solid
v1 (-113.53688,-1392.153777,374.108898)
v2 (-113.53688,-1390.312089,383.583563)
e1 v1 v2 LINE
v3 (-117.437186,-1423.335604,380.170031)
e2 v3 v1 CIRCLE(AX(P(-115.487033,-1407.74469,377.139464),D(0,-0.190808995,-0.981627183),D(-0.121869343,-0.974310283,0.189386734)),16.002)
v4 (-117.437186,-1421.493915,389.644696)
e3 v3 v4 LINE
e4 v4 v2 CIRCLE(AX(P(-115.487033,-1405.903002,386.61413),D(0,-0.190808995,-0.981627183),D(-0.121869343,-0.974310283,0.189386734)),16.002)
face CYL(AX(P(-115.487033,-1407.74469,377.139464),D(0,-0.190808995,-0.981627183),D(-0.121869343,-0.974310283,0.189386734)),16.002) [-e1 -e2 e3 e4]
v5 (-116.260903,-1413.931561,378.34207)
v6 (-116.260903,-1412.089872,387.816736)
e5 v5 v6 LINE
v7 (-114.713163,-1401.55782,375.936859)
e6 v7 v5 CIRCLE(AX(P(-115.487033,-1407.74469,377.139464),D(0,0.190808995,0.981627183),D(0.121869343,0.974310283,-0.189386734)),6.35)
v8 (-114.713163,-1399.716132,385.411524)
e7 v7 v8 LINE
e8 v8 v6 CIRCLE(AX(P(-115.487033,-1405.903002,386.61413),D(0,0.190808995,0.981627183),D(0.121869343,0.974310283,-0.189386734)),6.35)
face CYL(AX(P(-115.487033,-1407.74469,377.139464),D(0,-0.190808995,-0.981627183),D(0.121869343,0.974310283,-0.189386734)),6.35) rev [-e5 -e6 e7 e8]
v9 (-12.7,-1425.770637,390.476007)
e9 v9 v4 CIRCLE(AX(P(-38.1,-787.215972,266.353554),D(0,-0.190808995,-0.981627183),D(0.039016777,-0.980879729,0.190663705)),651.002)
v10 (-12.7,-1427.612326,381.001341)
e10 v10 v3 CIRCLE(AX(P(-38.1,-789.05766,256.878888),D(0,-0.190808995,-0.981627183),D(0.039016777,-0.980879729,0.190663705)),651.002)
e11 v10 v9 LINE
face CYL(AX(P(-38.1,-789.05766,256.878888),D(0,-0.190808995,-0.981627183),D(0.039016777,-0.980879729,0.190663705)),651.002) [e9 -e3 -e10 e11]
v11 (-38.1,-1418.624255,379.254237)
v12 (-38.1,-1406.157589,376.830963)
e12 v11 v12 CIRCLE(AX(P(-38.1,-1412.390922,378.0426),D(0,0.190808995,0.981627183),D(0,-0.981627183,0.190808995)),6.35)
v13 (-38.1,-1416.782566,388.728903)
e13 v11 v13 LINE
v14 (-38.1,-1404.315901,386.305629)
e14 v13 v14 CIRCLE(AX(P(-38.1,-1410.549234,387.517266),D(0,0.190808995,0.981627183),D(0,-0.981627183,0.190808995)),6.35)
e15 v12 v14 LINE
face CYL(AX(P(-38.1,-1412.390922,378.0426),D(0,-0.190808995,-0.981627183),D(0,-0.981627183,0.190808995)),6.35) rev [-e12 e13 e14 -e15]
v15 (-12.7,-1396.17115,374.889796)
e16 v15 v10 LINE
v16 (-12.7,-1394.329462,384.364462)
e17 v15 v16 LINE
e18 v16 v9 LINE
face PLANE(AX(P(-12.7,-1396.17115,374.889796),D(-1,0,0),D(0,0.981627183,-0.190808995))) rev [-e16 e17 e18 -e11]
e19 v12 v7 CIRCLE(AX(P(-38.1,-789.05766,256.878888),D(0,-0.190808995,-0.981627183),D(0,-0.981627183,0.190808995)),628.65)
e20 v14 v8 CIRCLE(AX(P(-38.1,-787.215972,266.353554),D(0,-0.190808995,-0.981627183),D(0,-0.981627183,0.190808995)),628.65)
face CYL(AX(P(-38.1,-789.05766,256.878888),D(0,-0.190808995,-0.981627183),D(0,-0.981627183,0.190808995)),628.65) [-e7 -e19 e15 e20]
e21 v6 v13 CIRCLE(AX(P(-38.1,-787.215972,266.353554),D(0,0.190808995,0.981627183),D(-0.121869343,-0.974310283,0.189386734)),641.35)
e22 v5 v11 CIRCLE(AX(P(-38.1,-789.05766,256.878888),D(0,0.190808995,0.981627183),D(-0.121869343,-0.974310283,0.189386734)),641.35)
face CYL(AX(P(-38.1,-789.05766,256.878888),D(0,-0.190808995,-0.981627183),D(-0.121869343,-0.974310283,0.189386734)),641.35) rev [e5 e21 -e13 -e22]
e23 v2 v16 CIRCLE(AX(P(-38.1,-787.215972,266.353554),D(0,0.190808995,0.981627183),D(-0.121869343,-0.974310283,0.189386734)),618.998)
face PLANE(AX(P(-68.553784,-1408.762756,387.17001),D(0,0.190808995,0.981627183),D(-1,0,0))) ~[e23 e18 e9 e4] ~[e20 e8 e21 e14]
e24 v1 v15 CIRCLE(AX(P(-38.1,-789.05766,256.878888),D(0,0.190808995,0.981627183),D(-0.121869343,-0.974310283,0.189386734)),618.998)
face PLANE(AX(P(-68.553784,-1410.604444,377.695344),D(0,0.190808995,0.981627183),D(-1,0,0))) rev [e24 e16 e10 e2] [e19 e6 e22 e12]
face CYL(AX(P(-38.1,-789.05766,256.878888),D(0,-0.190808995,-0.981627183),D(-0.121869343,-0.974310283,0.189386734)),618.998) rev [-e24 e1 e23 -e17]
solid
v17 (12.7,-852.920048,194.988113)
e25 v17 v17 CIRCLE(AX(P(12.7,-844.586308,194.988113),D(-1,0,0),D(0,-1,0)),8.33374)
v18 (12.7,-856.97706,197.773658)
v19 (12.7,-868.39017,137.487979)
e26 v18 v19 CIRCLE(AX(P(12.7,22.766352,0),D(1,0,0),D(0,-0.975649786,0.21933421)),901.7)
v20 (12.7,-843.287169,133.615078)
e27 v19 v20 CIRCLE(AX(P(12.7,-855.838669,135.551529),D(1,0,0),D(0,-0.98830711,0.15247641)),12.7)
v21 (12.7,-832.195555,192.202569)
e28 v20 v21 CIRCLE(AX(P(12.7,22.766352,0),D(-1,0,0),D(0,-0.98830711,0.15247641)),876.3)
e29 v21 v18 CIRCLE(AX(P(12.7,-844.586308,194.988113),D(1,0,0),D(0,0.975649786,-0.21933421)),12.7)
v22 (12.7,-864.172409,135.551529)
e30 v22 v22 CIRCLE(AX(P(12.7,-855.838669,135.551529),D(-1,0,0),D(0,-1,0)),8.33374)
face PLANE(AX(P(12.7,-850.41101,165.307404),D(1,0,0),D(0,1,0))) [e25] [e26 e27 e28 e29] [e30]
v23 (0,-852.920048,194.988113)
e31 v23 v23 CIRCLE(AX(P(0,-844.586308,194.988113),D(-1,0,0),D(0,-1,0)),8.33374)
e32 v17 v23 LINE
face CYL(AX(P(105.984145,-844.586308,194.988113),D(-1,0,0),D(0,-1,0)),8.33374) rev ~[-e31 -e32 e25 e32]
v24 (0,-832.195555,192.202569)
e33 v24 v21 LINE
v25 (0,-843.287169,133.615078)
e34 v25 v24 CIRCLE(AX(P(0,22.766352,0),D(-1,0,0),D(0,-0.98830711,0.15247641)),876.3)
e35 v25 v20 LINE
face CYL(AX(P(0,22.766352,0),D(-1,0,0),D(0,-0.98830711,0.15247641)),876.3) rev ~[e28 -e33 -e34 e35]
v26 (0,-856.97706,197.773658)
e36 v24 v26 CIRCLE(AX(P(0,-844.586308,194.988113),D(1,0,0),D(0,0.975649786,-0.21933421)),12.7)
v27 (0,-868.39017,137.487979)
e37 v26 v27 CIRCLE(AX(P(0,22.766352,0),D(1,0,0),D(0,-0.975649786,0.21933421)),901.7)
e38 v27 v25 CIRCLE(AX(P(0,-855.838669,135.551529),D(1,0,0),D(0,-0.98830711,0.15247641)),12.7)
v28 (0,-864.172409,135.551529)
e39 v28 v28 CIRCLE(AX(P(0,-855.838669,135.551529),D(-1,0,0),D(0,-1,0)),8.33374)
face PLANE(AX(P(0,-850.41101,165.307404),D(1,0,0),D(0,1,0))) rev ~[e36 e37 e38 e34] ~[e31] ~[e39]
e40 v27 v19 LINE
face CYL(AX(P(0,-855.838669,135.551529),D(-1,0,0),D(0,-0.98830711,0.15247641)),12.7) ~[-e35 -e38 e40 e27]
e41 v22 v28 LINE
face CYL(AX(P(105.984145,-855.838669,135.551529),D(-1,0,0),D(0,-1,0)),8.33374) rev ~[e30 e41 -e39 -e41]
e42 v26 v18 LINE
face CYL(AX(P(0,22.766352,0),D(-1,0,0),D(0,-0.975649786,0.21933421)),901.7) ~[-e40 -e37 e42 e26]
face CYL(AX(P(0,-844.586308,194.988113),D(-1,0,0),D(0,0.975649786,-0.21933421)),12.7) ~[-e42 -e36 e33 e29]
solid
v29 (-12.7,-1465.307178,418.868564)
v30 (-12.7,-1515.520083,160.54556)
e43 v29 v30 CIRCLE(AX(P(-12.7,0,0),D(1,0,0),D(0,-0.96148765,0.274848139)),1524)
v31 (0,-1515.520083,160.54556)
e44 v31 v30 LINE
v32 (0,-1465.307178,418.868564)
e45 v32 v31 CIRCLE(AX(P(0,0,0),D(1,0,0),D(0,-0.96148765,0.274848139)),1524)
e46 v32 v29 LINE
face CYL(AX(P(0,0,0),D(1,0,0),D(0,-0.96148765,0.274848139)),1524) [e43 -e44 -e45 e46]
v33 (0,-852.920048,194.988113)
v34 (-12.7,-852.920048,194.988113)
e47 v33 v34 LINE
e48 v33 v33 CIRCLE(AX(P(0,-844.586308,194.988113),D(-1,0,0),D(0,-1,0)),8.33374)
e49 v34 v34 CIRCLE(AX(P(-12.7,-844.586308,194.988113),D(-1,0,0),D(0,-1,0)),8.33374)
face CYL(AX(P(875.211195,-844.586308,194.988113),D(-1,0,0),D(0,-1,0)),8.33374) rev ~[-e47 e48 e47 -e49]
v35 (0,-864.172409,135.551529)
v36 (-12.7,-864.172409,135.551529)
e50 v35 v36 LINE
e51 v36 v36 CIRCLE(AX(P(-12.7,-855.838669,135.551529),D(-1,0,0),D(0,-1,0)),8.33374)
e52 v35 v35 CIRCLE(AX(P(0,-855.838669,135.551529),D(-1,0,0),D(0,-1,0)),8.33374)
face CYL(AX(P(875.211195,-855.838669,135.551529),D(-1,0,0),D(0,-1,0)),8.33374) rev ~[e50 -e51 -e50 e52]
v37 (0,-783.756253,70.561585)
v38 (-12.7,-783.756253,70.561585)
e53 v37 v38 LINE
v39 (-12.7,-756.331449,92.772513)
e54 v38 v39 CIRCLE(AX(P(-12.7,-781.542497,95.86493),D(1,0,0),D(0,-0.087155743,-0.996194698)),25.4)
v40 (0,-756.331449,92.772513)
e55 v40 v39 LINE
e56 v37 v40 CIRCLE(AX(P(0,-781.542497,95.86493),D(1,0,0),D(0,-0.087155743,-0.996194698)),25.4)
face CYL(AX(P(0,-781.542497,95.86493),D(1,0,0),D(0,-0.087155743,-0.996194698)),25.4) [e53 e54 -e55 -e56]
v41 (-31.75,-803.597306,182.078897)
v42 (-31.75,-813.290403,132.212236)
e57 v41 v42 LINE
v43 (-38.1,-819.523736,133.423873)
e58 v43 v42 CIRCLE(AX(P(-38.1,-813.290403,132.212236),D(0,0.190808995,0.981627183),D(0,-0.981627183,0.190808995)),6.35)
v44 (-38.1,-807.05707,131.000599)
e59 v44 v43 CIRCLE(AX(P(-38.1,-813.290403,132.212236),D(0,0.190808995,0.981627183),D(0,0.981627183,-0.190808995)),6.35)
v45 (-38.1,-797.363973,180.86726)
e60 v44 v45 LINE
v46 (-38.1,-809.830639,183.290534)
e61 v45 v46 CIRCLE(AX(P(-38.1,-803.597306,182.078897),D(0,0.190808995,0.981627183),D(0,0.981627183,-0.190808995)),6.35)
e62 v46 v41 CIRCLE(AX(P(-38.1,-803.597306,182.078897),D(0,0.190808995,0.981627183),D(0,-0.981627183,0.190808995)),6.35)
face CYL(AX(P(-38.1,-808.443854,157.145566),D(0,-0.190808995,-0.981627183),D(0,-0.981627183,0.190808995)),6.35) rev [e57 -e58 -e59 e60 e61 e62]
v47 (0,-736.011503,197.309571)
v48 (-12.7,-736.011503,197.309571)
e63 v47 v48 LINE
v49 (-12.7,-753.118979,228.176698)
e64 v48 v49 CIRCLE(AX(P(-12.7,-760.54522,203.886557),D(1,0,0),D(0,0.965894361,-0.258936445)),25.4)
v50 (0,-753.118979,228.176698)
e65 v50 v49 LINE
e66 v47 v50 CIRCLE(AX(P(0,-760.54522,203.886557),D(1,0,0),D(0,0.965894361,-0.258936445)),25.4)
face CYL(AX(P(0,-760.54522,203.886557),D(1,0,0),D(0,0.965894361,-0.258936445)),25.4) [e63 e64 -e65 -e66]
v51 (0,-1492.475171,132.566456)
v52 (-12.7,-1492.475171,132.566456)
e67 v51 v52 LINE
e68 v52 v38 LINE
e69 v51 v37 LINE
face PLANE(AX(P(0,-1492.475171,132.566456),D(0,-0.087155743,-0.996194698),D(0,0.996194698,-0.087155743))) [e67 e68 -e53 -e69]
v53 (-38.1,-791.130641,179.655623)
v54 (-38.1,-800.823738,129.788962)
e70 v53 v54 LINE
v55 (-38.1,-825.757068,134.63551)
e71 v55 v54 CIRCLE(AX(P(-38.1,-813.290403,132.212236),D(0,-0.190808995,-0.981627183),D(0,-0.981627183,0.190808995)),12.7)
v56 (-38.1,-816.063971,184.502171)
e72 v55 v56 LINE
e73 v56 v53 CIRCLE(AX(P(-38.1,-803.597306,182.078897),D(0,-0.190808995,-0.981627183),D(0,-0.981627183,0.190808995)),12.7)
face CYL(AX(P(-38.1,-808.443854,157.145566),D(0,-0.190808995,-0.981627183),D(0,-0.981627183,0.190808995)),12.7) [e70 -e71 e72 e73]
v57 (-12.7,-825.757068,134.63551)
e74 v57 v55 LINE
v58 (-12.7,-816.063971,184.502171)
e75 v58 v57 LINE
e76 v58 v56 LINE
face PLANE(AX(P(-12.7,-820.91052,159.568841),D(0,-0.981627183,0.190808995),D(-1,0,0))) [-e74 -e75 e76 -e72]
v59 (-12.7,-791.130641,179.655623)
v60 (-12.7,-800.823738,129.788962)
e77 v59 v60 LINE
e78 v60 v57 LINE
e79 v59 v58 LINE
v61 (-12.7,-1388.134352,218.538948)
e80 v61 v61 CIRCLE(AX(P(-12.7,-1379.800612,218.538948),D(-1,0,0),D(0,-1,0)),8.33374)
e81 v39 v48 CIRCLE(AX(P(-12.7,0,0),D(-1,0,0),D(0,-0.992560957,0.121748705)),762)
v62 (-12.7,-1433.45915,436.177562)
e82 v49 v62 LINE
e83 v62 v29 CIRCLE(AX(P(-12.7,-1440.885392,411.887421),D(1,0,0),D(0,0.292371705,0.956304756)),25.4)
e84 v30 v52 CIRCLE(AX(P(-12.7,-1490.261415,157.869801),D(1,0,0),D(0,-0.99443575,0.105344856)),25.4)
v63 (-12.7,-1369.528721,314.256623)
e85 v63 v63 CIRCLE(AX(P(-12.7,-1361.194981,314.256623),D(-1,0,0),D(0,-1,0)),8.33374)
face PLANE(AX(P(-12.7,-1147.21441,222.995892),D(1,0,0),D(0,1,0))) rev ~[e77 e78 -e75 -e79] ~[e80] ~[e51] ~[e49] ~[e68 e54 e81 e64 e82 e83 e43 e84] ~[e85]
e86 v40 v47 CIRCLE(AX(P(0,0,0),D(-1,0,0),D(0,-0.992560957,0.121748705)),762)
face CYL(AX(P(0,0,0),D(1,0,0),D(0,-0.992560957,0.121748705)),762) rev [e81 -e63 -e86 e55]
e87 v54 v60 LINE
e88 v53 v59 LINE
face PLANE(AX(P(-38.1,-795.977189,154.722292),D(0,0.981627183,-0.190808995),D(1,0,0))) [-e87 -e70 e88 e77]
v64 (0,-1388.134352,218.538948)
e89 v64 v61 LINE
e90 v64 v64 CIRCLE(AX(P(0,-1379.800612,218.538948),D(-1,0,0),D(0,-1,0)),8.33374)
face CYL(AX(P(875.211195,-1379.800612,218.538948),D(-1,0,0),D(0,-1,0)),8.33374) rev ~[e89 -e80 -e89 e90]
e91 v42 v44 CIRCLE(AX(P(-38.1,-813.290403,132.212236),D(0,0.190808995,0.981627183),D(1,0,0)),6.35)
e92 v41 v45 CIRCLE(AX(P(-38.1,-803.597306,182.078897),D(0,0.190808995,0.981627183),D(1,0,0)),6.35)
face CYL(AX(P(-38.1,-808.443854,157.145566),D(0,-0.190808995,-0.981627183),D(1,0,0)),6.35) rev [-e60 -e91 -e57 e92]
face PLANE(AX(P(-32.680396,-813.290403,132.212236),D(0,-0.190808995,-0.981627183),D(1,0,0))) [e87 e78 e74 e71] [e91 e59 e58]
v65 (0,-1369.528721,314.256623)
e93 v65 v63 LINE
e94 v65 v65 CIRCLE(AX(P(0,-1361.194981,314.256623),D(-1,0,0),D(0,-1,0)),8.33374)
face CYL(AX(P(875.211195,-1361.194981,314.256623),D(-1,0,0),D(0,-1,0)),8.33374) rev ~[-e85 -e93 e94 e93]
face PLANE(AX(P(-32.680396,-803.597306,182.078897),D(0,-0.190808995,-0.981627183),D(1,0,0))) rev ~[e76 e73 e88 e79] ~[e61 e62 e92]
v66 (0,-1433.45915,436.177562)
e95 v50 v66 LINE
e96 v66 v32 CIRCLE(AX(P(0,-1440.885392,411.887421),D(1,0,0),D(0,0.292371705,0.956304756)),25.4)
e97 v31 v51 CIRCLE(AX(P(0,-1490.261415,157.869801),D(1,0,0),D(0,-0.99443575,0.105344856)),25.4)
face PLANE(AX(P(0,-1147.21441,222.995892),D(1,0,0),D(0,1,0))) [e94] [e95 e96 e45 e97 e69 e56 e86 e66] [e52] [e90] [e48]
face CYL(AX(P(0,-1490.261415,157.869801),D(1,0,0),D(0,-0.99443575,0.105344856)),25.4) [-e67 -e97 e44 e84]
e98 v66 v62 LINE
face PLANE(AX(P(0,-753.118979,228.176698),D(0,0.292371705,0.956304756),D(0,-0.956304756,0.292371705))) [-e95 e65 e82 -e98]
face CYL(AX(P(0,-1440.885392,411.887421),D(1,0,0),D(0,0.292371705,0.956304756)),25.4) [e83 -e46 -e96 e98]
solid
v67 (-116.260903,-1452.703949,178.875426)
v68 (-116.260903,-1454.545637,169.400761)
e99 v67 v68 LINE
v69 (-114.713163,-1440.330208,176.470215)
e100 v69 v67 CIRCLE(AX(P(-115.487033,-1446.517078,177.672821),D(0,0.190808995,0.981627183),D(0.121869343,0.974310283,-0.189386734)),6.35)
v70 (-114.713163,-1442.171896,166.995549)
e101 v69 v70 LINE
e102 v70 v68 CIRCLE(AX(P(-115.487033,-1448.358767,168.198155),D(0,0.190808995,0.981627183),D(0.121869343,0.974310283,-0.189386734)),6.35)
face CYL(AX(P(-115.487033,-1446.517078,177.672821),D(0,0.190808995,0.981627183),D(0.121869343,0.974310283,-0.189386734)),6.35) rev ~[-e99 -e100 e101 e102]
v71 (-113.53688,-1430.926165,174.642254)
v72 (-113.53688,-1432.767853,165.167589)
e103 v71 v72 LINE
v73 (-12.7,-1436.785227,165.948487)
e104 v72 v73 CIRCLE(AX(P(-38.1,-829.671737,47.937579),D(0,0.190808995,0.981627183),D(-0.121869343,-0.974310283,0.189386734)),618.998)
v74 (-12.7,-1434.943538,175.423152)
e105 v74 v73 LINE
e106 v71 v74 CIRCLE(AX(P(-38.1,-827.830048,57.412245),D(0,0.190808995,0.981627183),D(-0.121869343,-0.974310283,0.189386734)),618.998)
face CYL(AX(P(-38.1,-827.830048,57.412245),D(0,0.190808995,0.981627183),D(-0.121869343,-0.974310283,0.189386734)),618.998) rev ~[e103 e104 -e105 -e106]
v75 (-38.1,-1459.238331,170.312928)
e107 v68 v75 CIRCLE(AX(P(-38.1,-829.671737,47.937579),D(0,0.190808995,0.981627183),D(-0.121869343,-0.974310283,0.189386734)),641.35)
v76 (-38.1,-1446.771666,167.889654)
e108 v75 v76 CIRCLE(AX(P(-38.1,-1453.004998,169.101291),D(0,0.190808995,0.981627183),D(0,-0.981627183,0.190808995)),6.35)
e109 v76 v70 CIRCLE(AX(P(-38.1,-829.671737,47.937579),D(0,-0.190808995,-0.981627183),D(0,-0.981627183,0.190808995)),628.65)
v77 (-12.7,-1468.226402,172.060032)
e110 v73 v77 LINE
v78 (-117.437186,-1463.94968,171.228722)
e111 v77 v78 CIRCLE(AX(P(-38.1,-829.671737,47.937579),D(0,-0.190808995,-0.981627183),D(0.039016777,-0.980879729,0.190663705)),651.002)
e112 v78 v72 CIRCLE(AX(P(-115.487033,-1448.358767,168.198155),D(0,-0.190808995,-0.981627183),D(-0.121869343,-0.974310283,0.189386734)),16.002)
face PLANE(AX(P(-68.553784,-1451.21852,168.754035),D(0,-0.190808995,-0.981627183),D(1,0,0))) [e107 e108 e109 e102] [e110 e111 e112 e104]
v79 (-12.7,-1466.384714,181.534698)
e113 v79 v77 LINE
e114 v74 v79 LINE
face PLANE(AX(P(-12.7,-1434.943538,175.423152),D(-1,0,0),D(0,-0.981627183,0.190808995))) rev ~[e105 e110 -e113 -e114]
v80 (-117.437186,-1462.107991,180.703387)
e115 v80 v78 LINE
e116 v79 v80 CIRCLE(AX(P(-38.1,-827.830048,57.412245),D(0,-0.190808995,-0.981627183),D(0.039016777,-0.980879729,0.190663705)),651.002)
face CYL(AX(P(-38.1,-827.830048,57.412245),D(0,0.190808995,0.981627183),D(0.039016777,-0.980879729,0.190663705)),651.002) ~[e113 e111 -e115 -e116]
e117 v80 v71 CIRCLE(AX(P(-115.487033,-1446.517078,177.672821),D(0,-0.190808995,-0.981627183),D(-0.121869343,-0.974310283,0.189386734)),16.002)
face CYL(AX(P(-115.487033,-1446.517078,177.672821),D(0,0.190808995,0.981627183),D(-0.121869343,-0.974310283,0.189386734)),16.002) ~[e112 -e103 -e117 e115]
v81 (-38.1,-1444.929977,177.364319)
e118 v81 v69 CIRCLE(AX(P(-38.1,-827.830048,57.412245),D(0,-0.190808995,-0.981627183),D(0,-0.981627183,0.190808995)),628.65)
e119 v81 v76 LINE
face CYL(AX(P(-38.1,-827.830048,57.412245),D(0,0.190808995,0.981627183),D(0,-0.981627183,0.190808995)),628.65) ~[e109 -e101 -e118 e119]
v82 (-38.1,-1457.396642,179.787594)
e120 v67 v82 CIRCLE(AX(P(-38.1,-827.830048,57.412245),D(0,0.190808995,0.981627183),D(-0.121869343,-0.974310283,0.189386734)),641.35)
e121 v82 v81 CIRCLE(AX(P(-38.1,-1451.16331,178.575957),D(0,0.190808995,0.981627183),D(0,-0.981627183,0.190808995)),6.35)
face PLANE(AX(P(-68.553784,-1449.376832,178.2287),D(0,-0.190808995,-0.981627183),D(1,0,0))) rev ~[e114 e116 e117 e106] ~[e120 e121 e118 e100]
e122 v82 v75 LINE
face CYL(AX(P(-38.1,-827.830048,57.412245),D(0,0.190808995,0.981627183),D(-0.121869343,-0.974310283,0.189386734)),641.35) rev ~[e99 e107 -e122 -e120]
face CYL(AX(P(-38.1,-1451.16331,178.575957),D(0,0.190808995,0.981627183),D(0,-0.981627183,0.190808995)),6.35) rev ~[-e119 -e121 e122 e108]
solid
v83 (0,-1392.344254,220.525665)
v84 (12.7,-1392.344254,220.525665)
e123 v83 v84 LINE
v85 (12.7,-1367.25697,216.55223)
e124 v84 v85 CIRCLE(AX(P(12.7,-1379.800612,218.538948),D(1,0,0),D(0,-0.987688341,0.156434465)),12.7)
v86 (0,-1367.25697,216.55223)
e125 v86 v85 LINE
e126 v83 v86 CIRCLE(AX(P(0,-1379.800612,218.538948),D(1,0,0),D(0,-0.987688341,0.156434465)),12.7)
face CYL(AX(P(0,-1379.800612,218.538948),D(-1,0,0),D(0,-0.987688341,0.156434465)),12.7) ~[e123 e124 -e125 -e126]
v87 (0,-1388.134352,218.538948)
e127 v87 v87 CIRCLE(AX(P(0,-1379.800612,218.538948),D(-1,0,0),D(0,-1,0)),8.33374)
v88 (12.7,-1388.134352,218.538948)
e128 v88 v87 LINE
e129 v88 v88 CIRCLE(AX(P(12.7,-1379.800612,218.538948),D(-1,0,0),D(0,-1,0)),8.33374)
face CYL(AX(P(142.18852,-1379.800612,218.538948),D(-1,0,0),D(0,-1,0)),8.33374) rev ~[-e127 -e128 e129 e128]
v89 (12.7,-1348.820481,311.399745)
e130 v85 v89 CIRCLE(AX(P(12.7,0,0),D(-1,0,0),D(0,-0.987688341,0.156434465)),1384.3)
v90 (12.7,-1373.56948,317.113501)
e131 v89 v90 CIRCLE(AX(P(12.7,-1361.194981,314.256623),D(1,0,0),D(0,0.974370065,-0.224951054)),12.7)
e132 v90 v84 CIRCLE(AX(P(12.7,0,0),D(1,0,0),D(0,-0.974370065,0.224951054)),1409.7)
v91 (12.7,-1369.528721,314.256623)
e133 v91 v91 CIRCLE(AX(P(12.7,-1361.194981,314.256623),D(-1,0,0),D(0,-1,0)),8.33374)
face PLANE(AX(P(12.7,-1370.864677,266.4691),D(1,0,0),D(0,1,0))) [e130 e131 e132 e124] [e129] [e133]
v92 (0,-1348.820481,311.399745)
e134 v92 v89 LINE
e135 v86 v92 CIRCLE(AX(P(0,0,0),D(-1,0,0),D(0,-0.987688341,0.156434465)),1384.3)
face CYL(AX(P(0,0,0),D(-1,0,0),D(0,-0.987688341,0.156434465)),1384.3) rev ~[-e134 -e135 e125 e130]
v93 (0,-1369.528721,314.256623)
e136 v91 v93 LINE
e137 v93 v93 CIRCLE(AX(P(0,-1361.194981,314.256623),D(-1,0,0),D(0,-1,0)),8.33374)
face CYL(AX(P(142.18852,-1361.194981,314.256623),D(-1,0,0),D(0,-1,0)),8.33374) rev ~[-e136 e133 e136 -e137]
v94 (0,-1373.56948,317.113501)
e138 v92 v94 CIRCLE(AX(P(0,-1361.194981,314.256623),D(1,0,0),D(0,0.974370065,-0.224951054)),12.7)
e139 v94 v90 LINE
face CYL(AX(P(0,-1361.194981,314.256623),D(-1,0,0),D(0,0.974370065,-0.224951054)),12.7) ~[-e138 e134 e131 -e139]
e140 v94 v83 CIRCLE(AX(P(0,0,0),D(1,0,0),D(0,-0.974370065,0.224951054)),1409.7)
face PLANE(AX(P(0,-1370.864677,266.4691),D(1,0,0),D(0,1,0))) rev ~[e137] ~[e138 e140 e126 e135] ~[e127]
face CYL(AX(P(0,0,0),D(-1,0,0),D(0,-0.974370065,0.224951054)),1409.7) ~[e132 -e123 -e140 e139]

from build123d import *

# Parameters (mm, degrees)
F1_DEPTH  = 12.7
F2_DEPTH  = 12.7
F4_D      = 16.66748
F7_DEPTH  = 25.4
F10_DEPTH = 9.652
F13_D     = 16.66748
F15_D     = 16.66748


# Not quite as in the source:
# - a feature of the source that left no trace in its solid (it failed there, or was rolled back) is left out
# - a pattern or mirror of a feature is missing from the dataset's text; its kind, count and spacing are read off the source's solid


with BuildPart() as f1:
    # F0 (on Right) → F1 (new body)
    with BuildSketch(Plane.YZ):
        with BuildLine():
            ThreePointArc((-756.3314490517, 92.7725130381), (-747.9999137871, 145.3964544769), (-736.0115033336, 197.3095713861))
            ThreePointArc((-736.0115033336, 197.3095713861), (-738.3291312366, 216.1993713631), (-753.1189788115, 228.1766979004))
            Line((-753.1189788115, 228.1766979004), (-1433.4591504296, 436.1775621929))
            ThreePointArc((-1433.4591504296, 436.1775621929), (-1453.0143855451, 434.2043994356), (-1465.30717803, 418.8685641269))
            ThreePointArc((-1465.30717803, 418.8685641269), (-1495.9998275742, 290.7929089539), (-1515.5200833468, 160.5455604257))
            ThreePointArc((-1515.5200833468, 160.5455604257), (-1509.8673096495, 141.7214604148), (-1492.4751711568, 132.5664557537))
            Line((-1492.4751711568, 132.5664557537), (-783.7562532192, 70.5615848078))
            ThreePointArc((-783.7562532192, 70.5615848078), (-765.5565598439, 76.1263941769), (-756.3314490517, 92.7725130381))
        make_face()
        with BuildLine():
            ThreePointArc((-868.3901696878, 137.4879790683), (-863.196533516, 167.7279226013), (-856.9770599652, 197.7736575783))
            ThreePointArc((-856.9770599652, 197.7736575783), (-841.8007632153, 207.3788653824), (-832.1955554113, 192.2025686325))
            ThreePointArc((-832.1955554113, 192.2025686325), (-838.239832524, 163.0031923871), (-843.2871690853, 133.6150782495))
            ThreePointArc((-843.2871690853, 133.6150782495), (-857.775119796, 123.0000283577), (-868.3901696878, 137.4879790683))
        make_face(mode=Mode.SUBTRACT)
        with BuildLine():
            ThreePointArc((-1392.344253737, 220.5256653672), (-1383.7998405062, 268.9834407823), (-1373.5694803277, 317.1135013085))
            ThreePointArc((-1373.5694803277, 317.1135013085), (-1358.3381021148, 326.6311227412), (-1348.8204806822, 311.3997445282))
            ThreePointArc((-1348.8204806822, 311.3997445282), (-1358.8665100466, 264.1368922998), (-1367.2569698858, 216.5522299552))
            ThreePointArc((-1367.2569698858, 216.5522299552), (-1381.7873295174, 205.9953057356), (-1392.344253737, 220.5256653672))
        make_face(mode=Mode.SUBTRACT)
        with BuildLine():
            ThreePointArc((-1348.8204806822, 311.3997445282), (-1358.3381021148, 326.6311227412), (-1373.5694803277, 317.1135013085))
            ThreePointArc((-1373.5694803277, 317.1135013085), (-1383.7998405062, 268.9834407823), (-1392.344253737, 220.5256653672))
            ThreePointArc((-1392.344253737, 220.5256653672), (-1381.7873295174, 205.9953057356), (-1367.2569698858, 216.5522299552))
            ThreePointArc((-1367.2569698858, 216.5522299552), (-1358.8665100466, 264.1368922998), (-1348.8204806822, 311.3997445282))
        make_face()
        with BuildLine():
            ThreePointArc((-832.1955554113, 192.2025686325), (-841.8007632153, 207.3788653824), (-856.9770599652, 197.7736575783))
            ThreePointArc((-856.9770599652, 197.7736575783), (-863.196533516, 167.7279226013), (-868.3901696878, 137.4879790683))
            ThreePointArc((-868.3901696878, 137.4879790683), (-857.775119796, 123.0000283577), (-843.2871690853, 133.6150782495))
            ThreePointArc((-843.2871690853, 133.6150782495), (-838.239832524, 163.0031923871), (-832.1955554113, 192.2025686325))
        make_face()
    extrude(amount=-F1_DEPTH)

    # F4 (through all)
    with Locations(Plane.YZ.offset(12.7)):
        with Locations((-1361.194980505, 314.2566229184), (-1379.8006118114, 218.5389476612), (-844.5863076883, 194.9881131054), (-855.8386693866, 135.5515286589)):
            Hole(F4_D / 2)

    # F6 (on face) → F7 (join, symmetric)
    with BuildSketch(Plane(origin=(0, 0, 0), x_dir=(1, 0, 0), z_dir=(0, -0.1908089954, -0.9816271834))):
        with BuildLine():
            ThreePointArc((-38.1, 829.9252514334), (-33.6098719395, 828.0653794939), (-31.75, 823.5752514334))
            ThreePointArc((-31.75, 823.5752514334), (-33.6098719395, 819.0851233729), (-38.1, 817.2252514334))
            Line((-38.1, 817.2252514334), (-38.1, 810.8752514334))
            ThreePointArc((-38.1, 810.8752514334), (-29.1197438789, 814.5949953123), (-25.4, 823.5752514334))
            ThreePointArc((-25.4, 823.5752514334), (-29.1197438789, 832.5555075545), (-38.1, 836.2752514334))
            Line((-38.1, 836.2752514334), (-38.1, 829.9252514334))
        make_face()
        with BuildLine():
            ThreePointArc((-38.1, 817.2252514334), (-44.45, 823.5752514334), (-38.1, 829.9252514334))
            Line((-38.1, 829.9252514334), (-38.1, 836.2752514334))
            ThreePointArc((-38.1, 836.2752514334), (-50.8, 823.5752514334), (-38.1, 810.8752514334))
            Line((-38.1, 810.8752514334), (-38.1, 817.2252514334))
        make_face()
        with BuildLine():
            Line((-12.7, 836.2752514334), (-38.1, 836.2752514334))
            ThreePointArc((-38.1, 836.2752514334), (-29.1197438789, 832.5555075545), (-25.4, 823.5752514334))
            ThreePointArc((-25.4, 823.5752514334), (-29.1197438789, 814.5949953123), (-38.1, 810.8752514334))
            Line((-38.1, 810.8752514334), (-12.7, 810.8752514334))
            Line((-12.7, 810.8752514334), (-12.7, 836.2752514334))
        make_face()
    extrude(amount=F7_DEPTH, both=True)


with BuildPart() as f2:
    # F0 (on Right) → F2 (new body)
    with BuildSketch(Plane.YZ):
        with BuildLine():
            ThreePointArc((-1348.8204806822, 311.3997445282), (-1358.3381021148, 326.6311227412), (-1373.5694803277, 317.1135013085))
            ThreePointArc((-1373.5694803277, 317.1135013085), (-1383.7998405062, 268.9834407823), (-1392.344253737, 220.5256653672))
            ThreePointArc((-1392.344253737, 220.5256653672), (-1381.7873295174, 205.9953057356), (-1367.2569698858, 216.5522299552))
            ThreePointArc((-1367.2569698858, 216.5522299552), (-1358.8665100466, 264.1368922998), (-1348.8204806822, 311.3997445282))
        make_face()
    extrude(amount=F2_DEPTH)

    # F15 (through all)
    with Locations(Plane.YZ.offset(12.7)):
        with Locations((-1361.194980505, 314.2566229184), (-1379.8006118114, 218.5389476612)):
            Hole(F15_D / 2)


with BuildPart() as f2b:
    # F0 (on Right) → F2, piece 2 (new body)
    with BuildSketch(Plane.YZ):
        with BuildLine():
            ThreePointArc((-832.1955554113, 192.2025686325), (-841.8007632153, 207.3788653824), (-856.9770599652, 197.7736575783))
            ThreePointArc((-856.9770599652, 197.7736575783), (-863.196533516, 167.7279226013), (-868.3901696878, 137.4879790683))
            ThreePointArc((-868.3901696878, 137.4879790683), (-857.775119796, 123.0000283577), (-843.2871690853, 133.6150782495))
            ThreePointArc((-843.2871690853, 133.6150782495), (-838.239832524, 163.0031923871), (-832.1955554113, 192.2025686325))
        make_face()
    extrude(amount=F2_DEPTH)

    # F13 (through all)
    with Locations(Plane.YZ.offset(12.7)):
        with Locations((-844.5863076883, 194.9881131054), (-855.8386693866, 135.5515286589)):
            Hole(F13_D / 2)


with BuildPart() as f10:
    # F9 (on face) → F10 (new body)
    with BuildSketch(Plane(origin=(0, -19.3861939303, -99.7333218383), x_dir=(1, 0, 0), z_dir=(0, -0.1908089954, -0.9816271834))):
        with BuildLine():
            Line((-12.7, 1458.0670480707), (-12.7, 1474.0815496381))
            ThreePointArc((-12.7, 1474.0815496381), (-65.1564294406, 1474.0147594815), (-117.4371862954, 1469.7247812442))
            ThreePointArc((-117.4371862954, 1469.7247812442), (-131.3697565808, 1451.8919044925), (-113.5368798291, 1437.9593342071))
            ThreePointArc((-113.5368798291, 1437.9593342071), (-63.2019841466, 1442.064066527), (-12.7, 1442.0518993386))
            Line((-12.7, 1442.0518993386), (-12.7, 1458.0670480707))
        make_face()
        with BuildLine():
            ThreePointArc((-38.1, 1464.9252514334), (-31.75, 1458.5752514334), (-38.1, 1452.2252514334))
            ThreePointArc((-38.1, 1452.2252514334), (-76.4781643786, 1451.0526924613), (-114.7131627316, 1447.5393896627))
            ThreePointArc((-114.7131627316, 1447.5393896627), (-121.7897011252, 1453.068187395), (-116.2609033929, 1460.1447257886))
            ThreePointArc((-116.2609033929, 1460.1447257886), (-77.2534808307, 1463.7290044013), (-38.1, 1464.9252514334))
        make_face(mode=Mode.SUBTRACT)
    extrude(amount=F10_DEPTH)


with BuildPart() as f10_copies_1:
    # F10_copies: instance of F10
    add(f10.part.mirror(Plane(origin=(0, 0, 0), x_dir=(0, 0.9816271834, -0.1908089954), z_dir=(0, 0.1908089954, 0.9816271834))))


solid = Compound([f1.part, f2.part, f2b.part, f10.part, f10_copies_1.part])
